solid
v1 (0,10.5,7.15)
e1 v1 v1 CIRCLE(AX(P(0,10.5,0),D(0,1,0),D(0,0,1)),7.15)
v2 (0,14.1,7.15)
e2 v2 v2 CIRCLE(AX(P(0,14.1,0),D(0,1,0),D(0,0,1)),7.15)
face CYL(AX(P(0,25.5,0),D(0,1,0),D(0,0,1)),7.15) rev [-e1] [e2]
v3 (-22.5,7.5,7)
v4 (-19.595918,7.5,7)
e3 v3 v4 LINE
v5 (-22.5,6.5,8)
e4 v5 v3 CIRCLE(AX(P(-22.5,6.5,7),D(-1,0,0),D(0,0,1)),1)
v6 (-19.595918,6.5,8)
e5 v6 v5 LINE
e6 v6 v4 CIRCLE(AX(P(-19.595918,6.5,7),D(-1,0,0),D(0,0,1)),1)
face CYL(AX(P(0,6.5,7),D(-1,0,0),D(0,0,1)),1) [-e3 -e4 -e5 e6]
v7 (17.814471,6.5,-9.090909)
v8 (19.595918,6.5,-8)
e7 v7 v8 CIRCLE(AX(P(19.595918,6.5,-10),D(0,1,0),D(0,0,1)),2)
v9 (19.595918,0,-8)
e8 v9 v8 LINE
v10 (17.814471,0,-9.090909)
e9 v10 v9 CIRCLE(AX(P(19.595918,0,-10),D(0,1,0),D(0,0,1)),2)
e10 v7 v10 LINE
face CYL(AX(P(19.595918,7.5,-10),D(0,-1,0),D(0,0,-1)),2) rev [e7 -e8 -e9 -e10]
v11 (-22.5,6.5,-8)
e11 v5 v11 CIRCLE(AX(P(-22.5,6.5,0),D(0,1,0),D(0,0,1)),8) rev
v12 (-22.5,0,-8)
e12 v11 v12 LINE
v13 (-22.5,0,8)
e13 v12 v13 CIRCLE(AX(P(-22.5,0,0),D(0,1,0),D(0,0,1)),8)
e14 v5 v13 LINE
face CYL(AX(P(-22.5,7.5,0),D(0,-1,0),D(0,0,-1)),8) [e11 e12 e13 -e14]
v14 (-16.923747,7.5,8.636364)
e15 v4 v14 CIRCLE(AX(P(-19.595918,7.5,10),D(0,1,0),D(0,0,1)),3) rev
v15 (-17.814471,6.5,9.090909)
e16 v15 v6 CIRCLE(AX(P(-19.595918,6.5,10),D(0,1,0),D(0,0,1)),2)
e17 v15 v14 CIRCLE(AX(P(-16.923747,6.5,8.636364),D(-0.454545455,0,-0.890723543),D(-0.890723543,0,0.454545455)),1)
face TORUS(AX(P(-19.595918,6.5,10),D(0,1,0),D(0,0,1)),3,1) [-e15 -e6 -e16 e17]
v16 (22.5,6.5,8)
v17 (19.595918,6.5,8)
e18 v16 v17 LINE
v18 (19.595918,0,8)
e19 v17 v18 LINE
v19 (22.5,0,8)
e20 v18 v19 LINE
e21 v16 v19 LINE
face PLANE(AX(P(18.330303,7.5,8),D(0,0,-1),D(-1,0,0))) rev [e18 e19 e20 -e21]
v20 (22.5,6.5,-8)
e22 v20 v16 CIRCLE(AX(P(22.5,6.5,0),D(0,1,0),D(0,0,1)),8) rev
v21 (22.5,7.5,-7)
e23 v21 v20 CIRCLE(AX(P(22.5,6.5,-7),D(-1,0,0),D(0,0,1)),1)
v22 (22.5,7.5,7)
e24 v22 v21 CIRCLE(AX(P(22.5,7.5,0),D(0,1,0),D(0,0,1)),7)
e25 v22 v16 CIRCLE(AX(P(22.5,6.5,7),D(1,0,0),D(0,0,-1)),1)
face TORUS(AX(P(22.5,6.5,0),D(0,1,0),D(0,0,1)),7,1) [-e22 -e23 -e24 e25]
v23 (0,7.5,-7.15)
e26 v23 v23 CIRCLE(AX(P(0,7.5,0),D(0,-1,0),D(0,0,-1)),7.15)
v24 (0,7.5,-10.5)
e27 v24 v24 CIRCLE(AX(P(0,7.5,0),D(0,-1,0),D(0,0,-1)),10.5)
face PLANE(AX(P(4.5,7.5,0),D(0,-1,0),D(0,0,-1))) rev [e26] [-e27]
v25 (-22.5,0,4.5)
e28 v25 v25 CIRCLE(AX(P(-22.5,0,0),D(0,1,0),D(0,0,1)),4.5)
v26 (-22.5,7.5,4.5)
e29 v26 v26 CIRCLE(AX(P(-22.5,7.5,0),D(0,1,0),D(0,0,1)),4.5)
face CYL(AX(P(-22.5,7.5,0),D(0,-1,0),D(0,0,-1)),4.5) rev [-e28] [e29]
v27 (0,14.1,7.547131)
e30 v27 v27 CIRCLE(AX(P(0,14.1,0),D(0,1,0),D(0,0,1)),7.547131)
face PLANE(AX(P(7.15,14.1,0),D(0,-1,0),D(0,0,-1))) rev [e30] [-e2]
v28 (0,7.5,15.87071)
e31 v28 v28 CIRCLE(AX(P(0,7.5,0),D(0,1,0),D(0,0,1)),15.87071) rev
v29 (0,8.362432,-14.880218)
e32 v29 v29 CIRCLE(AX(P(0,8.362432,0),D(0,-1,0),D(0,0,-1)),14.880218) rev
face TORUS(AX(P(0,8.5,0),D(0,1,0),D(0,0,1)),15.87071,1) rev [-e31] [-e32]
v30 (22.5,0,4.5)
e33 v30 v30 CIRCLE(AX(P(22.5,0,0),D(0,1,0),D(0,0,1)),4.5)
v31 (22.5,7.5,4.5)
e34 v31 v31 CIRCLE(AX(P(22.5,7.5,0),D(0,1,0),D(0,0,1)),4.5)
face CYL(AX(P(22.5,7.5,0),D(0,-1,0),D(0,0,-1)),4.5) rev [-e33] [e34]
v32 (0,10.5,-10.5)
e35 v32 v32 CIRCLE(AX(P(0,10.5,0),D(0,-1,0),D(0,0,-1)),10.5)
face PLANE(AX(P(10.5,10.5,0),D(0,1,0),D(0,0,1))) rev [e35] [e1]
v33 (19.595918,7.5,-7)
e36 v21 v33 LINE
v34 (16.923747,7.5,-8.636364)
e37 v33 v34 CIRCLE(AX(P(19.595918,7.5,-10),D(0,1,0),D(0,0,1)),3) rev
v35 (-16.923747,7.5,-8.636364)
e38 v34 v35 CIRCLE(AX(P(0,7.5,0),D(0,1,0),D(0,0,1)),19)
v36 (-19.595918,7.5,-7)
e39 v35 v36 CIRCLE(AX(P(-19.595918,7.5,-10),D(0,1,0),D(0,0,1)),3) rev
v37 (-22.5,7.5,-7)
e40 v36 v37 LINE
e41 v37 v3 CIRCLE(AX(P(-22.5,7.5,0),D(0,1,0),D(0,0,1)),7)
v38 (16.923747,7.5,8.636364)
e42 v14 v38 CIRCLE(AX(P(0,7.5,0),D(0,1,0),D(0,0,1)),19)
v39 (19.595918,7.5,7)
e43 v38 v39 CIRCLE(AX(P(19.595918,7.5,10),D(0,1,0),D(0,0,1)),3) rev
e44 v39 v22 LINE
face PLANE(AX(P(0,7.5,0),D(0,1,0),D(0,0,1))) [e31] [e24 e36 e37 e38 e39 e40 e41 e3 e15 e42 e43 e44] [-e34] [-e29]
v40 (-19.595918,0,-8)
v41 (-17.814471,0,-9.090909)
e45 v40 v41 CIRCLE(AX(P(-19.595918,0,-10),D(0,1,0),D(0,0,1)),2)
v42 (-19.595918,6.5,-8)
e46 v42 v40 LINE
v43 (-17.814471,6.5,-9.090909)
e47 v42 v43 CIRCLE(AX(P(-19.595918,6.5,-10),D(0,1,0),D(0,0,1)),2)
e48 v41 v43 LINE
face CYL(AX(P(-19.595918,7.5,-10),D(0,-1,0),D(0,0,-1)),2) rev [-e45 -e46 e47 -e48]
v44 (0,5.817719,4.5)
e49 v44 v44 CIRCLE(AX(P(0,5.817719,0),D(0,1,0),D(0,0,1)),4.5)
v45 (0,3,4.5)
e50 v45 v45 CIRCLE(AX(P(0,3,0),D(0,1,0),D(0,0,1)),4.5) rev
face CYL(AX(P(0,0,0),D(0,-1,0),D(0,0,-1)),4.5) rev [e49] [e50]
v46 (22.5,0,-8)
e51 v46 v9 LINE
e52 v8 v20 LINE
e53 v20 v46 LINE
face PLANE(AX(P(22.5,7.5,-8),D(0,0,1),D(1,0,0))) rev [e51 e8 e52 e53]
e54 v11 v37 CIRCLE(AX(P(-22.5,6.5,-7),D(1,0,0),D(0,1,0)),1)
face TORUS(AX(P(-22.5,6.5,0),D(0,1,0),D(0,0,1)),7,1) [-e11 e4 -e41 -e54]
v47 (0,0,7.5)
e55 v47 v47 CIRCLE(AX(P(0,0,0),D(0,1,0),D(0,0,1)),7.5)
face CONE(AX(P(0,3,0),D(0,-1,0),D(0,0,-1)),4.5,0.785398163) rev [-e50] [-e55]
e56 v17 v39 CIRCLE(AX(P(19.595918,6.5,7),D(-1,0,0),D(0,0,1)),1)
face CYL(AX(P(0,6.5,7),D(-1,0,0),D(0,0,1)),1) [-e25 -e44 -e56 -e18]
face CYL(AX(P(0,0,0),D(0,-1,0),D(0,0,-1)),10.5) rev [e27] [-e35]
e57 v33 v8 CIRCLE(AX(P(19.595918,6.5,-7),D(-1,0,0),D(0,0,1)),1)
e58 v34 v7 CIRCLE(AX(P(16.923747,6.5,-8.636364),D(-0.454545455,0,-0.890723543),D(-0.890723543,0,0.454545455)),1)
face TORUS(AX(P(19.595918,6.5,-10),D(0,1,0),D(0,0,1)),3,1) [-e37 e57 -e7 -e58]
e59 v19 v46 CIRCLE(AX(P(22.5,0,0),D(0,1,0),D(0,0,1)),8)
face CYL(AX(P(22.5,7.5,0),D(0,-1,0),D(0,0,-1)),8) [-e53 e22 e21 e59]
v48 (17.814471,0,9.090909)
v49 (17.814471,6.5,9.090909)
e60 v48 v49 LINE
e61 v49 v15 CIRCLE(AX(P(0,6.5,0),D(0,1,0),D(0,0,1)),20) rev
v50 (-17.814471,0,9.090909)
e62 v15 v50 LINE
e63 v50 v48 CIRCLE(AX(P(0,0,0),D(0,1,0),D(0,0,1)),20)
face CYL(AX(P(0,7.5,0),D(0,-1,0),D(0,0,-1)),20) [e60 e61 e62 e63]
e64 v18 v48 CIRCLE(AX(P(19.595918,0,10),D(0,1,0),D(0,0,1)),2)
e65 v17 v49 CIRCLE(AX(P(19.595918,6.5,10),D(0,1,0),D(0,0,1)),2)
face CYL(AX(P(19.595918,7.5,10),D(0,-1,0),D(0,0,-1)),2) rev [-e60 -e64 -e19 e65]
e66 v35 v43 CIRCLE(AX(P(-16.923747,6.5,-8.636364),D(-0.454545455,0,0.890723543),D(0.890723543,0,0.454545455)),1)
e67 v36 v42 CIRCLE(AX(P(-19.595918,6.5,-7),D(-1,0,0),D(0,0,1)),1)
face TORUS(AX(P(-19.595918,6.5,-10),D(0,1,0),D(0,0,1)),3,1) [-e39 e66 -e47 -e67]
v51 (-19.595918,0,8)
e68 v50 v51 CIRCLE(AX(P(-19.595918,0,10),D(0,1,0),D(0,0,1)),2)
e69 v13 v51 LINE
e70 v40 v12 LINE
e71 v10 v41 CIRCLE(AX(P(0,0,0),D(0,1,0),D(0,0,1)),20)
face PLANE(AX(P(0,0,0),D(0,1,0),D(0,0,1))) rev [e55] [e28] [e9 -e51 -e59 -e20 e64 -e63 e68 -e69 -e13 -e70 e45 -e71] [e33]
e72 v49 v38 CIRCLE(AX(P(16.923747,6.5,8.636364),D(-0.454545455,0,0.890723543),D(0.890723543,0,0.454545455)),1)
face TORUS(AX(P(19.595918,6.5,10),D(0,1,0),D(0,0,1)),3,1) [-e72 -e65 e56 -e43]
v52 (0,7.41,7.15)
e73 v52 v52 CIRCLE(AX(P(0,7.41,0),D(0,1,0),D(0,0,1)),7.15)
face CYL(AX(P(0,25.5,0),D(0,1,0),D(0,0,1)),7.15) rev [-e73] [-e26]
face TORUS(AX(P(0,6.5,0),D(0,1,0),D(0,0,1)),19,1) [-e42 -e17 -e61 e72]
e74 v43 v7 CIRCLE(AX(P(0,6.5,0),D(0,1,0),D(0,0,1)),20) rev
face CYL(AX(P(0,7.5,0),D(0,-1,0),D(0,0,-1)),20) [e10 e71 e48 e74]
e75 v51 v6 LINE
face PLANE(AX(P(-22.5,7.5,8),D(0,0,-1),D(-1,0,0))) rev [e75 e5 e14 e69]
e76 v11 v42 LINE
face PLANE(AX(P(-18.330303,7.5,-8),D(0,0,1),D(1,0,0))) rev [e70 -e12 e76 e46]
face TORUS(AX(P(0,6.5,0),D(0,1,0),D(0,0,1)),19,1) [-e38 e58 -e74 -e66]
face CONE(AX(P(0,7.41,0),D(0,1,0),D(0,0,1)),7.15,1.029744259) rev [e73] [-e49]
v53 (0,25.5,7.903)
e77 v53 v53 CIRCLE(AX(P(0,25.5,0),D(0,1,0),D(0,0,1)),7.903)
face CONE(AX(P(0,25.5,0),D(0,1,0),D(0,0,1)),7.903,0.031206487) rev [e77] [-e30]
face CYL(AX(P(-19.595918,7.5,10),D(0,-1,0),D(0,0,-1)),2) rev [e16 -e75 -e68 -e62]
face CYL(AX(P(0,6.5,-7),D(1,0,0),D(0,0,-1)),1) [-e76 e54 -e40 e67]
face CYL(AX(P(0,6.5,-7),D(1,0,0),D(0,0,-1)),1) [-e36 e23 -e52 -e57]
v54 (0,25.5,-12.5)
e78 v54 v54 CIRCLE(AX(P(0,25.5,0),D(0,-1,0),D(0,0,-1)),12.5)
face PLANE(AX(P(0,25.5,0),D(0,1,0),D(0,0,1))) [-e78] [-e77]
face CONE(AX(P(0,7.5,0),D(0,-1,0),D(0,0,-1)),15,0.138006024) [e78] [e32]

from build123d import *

# Parameters (mm, degrees)
EXTRUDE_1_OUTLINE_R = 4.5
EXTRUDE_1_DEPTH     = 7.5
FILLET_1_R          = 2
FILLET_2_R          = 1
CHAMFER_1_SIZE      = 3


# Read off the part's stored shape, not the designer's step: 伸長1
with BuildPart() as part:
    # 伸長1 outline → 伸長1 (new body)
    with BuildSketch(Plane(origin=(0, 0, 0), x_dir=(1, 0, 0), z_dir=(0, 1, 0))):
        with BuildLine():
            ThreePointArc((18.33030278, 8), (0, 20), (-18.33030278, 8))
            Line((-18.33030278, 8), (-22.5, 8))
            ThreePointArc((-22.5, 8), (-30.5, 0), (-22.5, -8))
            Line((-22.5, -8), (-18.33030278, -8))
            ThreePointArc((-18.33030278, -8), (0, -20), (18.33030278, -8))
            Line((18.33030278, -8), (22.5, -8))
            ThreePointArc((22.5, -8), (30.5, 0), (22.5, 8))
            Line((22.5, 8), (18.33030278, 8))
        make_face()
        with Locations((-22.5, 0)):
            Circle(EXTRUDE_1_OUTLINE_R, mode=Mode.SUBTRACT)
        with Locations((22.5, 0)):
            Circle(EXTRUDE_1_OUTLINE_R, mode=Mode.SUBTRACT)
    extrude(amount=EXTRUDE_1_DEPTH)

    # 圓角1
    fillet_1_edges = [part.edges().sort_by_distance(p)[0] for p in [
        (18.33030278, 3.75, -8),
        (18.33030278, 3.75, 8),
        (-18.33030278, 3.75, 8),
        (-18.33030278, 3.75, -8),
    ]]
    fillet(fillet_1_edges, radius=FILLET_1_R)

    # 草圖3 → 旋轉1 (revolve)
    with BuildSketch(Plane.XY, mode=Mode.PRIVATE) as revolve_1_sk:
        Polygon((0, 25.5), (12.5, 25.5), (15, 7.5), (0, 7.5), align=None)
    revolve(revolve_1_sk.sketch.rotate(Axis((0, 0, 0), (0, 1, 0)), 90), axis=Axis((0, 0, 0), (0, 1, 0)))

    # 圓角2
    fillet_2_edges = [part.edges().sort_by_distance(p)[0] for p in [
        (-30.5, 7.5, 0),
        (-21.047958971, 7.5, 8),
        (30.5, 7.5, 0),
        (21.047958971, 7.5, -8),
        (21.047958971, 7.5, 8),
        (0, 7.5, 20),
        (0, 7.5, -20),
        (-21.047958971, 7.5, -8),
        (18.551452007, 7.5, 8.294394269),
        (18.551452007, 7.5, -8.294394269),
        (-18.551452007, 7.5, -8.294394269),
        (-18.551452007, 7.5, 8.294394269),
        (0, 7.5, 15),
    ]]
    fillet(fillet_2_edges, radius=FILLET_2_R)

    # 草圖4 → 除料-旋轉1 (revolve, cut)
    with BuildSketch(Plane.XY, mode=Mode.PRIVATE) as cut_revolve_1_sk:
        Polygon((0, 0), (4.5, 0), (4.5, 7.5), (10.5, 7.5), (10.5, 10.5), (0, 10.5), align=None)
    revolve(cut_revolve_1_sk.sketch.rotate(Axis((0, 0, 0), (0, 1, 0)), 90), axis=Axis((0, 0, 0), (0, 1, 0)), mode=Mode.SUBTRACT)

    # 導角1
    chamfer_1_edges = [part.edges().sort_by_distance(p)[0] for p in [
        (0, 0, 4.5),
    ]]
    chamfer(chamfer_1_edges, length=CHAMFER_1_SIZE)

    # 草圖7 → 3/8 Rc 螺紋孔1 (revolve, cut)
    with BuildSketch(Plane(origin=(0, 25.5, 0), x_dir=(0, 0, 1), z_dir=(1, 0, 0))):
        Polygon((0, 0), (0, 22.386153426), (7.15, 18.09), (7.15, 11.4), (7.54713052, 11.4), (7.903, 0), align=None)
    revolve(axis=Axis((0, 31.85, 0), (0, -1, 0)), mode=Mode.SUBTRACT)


solid = part.part
